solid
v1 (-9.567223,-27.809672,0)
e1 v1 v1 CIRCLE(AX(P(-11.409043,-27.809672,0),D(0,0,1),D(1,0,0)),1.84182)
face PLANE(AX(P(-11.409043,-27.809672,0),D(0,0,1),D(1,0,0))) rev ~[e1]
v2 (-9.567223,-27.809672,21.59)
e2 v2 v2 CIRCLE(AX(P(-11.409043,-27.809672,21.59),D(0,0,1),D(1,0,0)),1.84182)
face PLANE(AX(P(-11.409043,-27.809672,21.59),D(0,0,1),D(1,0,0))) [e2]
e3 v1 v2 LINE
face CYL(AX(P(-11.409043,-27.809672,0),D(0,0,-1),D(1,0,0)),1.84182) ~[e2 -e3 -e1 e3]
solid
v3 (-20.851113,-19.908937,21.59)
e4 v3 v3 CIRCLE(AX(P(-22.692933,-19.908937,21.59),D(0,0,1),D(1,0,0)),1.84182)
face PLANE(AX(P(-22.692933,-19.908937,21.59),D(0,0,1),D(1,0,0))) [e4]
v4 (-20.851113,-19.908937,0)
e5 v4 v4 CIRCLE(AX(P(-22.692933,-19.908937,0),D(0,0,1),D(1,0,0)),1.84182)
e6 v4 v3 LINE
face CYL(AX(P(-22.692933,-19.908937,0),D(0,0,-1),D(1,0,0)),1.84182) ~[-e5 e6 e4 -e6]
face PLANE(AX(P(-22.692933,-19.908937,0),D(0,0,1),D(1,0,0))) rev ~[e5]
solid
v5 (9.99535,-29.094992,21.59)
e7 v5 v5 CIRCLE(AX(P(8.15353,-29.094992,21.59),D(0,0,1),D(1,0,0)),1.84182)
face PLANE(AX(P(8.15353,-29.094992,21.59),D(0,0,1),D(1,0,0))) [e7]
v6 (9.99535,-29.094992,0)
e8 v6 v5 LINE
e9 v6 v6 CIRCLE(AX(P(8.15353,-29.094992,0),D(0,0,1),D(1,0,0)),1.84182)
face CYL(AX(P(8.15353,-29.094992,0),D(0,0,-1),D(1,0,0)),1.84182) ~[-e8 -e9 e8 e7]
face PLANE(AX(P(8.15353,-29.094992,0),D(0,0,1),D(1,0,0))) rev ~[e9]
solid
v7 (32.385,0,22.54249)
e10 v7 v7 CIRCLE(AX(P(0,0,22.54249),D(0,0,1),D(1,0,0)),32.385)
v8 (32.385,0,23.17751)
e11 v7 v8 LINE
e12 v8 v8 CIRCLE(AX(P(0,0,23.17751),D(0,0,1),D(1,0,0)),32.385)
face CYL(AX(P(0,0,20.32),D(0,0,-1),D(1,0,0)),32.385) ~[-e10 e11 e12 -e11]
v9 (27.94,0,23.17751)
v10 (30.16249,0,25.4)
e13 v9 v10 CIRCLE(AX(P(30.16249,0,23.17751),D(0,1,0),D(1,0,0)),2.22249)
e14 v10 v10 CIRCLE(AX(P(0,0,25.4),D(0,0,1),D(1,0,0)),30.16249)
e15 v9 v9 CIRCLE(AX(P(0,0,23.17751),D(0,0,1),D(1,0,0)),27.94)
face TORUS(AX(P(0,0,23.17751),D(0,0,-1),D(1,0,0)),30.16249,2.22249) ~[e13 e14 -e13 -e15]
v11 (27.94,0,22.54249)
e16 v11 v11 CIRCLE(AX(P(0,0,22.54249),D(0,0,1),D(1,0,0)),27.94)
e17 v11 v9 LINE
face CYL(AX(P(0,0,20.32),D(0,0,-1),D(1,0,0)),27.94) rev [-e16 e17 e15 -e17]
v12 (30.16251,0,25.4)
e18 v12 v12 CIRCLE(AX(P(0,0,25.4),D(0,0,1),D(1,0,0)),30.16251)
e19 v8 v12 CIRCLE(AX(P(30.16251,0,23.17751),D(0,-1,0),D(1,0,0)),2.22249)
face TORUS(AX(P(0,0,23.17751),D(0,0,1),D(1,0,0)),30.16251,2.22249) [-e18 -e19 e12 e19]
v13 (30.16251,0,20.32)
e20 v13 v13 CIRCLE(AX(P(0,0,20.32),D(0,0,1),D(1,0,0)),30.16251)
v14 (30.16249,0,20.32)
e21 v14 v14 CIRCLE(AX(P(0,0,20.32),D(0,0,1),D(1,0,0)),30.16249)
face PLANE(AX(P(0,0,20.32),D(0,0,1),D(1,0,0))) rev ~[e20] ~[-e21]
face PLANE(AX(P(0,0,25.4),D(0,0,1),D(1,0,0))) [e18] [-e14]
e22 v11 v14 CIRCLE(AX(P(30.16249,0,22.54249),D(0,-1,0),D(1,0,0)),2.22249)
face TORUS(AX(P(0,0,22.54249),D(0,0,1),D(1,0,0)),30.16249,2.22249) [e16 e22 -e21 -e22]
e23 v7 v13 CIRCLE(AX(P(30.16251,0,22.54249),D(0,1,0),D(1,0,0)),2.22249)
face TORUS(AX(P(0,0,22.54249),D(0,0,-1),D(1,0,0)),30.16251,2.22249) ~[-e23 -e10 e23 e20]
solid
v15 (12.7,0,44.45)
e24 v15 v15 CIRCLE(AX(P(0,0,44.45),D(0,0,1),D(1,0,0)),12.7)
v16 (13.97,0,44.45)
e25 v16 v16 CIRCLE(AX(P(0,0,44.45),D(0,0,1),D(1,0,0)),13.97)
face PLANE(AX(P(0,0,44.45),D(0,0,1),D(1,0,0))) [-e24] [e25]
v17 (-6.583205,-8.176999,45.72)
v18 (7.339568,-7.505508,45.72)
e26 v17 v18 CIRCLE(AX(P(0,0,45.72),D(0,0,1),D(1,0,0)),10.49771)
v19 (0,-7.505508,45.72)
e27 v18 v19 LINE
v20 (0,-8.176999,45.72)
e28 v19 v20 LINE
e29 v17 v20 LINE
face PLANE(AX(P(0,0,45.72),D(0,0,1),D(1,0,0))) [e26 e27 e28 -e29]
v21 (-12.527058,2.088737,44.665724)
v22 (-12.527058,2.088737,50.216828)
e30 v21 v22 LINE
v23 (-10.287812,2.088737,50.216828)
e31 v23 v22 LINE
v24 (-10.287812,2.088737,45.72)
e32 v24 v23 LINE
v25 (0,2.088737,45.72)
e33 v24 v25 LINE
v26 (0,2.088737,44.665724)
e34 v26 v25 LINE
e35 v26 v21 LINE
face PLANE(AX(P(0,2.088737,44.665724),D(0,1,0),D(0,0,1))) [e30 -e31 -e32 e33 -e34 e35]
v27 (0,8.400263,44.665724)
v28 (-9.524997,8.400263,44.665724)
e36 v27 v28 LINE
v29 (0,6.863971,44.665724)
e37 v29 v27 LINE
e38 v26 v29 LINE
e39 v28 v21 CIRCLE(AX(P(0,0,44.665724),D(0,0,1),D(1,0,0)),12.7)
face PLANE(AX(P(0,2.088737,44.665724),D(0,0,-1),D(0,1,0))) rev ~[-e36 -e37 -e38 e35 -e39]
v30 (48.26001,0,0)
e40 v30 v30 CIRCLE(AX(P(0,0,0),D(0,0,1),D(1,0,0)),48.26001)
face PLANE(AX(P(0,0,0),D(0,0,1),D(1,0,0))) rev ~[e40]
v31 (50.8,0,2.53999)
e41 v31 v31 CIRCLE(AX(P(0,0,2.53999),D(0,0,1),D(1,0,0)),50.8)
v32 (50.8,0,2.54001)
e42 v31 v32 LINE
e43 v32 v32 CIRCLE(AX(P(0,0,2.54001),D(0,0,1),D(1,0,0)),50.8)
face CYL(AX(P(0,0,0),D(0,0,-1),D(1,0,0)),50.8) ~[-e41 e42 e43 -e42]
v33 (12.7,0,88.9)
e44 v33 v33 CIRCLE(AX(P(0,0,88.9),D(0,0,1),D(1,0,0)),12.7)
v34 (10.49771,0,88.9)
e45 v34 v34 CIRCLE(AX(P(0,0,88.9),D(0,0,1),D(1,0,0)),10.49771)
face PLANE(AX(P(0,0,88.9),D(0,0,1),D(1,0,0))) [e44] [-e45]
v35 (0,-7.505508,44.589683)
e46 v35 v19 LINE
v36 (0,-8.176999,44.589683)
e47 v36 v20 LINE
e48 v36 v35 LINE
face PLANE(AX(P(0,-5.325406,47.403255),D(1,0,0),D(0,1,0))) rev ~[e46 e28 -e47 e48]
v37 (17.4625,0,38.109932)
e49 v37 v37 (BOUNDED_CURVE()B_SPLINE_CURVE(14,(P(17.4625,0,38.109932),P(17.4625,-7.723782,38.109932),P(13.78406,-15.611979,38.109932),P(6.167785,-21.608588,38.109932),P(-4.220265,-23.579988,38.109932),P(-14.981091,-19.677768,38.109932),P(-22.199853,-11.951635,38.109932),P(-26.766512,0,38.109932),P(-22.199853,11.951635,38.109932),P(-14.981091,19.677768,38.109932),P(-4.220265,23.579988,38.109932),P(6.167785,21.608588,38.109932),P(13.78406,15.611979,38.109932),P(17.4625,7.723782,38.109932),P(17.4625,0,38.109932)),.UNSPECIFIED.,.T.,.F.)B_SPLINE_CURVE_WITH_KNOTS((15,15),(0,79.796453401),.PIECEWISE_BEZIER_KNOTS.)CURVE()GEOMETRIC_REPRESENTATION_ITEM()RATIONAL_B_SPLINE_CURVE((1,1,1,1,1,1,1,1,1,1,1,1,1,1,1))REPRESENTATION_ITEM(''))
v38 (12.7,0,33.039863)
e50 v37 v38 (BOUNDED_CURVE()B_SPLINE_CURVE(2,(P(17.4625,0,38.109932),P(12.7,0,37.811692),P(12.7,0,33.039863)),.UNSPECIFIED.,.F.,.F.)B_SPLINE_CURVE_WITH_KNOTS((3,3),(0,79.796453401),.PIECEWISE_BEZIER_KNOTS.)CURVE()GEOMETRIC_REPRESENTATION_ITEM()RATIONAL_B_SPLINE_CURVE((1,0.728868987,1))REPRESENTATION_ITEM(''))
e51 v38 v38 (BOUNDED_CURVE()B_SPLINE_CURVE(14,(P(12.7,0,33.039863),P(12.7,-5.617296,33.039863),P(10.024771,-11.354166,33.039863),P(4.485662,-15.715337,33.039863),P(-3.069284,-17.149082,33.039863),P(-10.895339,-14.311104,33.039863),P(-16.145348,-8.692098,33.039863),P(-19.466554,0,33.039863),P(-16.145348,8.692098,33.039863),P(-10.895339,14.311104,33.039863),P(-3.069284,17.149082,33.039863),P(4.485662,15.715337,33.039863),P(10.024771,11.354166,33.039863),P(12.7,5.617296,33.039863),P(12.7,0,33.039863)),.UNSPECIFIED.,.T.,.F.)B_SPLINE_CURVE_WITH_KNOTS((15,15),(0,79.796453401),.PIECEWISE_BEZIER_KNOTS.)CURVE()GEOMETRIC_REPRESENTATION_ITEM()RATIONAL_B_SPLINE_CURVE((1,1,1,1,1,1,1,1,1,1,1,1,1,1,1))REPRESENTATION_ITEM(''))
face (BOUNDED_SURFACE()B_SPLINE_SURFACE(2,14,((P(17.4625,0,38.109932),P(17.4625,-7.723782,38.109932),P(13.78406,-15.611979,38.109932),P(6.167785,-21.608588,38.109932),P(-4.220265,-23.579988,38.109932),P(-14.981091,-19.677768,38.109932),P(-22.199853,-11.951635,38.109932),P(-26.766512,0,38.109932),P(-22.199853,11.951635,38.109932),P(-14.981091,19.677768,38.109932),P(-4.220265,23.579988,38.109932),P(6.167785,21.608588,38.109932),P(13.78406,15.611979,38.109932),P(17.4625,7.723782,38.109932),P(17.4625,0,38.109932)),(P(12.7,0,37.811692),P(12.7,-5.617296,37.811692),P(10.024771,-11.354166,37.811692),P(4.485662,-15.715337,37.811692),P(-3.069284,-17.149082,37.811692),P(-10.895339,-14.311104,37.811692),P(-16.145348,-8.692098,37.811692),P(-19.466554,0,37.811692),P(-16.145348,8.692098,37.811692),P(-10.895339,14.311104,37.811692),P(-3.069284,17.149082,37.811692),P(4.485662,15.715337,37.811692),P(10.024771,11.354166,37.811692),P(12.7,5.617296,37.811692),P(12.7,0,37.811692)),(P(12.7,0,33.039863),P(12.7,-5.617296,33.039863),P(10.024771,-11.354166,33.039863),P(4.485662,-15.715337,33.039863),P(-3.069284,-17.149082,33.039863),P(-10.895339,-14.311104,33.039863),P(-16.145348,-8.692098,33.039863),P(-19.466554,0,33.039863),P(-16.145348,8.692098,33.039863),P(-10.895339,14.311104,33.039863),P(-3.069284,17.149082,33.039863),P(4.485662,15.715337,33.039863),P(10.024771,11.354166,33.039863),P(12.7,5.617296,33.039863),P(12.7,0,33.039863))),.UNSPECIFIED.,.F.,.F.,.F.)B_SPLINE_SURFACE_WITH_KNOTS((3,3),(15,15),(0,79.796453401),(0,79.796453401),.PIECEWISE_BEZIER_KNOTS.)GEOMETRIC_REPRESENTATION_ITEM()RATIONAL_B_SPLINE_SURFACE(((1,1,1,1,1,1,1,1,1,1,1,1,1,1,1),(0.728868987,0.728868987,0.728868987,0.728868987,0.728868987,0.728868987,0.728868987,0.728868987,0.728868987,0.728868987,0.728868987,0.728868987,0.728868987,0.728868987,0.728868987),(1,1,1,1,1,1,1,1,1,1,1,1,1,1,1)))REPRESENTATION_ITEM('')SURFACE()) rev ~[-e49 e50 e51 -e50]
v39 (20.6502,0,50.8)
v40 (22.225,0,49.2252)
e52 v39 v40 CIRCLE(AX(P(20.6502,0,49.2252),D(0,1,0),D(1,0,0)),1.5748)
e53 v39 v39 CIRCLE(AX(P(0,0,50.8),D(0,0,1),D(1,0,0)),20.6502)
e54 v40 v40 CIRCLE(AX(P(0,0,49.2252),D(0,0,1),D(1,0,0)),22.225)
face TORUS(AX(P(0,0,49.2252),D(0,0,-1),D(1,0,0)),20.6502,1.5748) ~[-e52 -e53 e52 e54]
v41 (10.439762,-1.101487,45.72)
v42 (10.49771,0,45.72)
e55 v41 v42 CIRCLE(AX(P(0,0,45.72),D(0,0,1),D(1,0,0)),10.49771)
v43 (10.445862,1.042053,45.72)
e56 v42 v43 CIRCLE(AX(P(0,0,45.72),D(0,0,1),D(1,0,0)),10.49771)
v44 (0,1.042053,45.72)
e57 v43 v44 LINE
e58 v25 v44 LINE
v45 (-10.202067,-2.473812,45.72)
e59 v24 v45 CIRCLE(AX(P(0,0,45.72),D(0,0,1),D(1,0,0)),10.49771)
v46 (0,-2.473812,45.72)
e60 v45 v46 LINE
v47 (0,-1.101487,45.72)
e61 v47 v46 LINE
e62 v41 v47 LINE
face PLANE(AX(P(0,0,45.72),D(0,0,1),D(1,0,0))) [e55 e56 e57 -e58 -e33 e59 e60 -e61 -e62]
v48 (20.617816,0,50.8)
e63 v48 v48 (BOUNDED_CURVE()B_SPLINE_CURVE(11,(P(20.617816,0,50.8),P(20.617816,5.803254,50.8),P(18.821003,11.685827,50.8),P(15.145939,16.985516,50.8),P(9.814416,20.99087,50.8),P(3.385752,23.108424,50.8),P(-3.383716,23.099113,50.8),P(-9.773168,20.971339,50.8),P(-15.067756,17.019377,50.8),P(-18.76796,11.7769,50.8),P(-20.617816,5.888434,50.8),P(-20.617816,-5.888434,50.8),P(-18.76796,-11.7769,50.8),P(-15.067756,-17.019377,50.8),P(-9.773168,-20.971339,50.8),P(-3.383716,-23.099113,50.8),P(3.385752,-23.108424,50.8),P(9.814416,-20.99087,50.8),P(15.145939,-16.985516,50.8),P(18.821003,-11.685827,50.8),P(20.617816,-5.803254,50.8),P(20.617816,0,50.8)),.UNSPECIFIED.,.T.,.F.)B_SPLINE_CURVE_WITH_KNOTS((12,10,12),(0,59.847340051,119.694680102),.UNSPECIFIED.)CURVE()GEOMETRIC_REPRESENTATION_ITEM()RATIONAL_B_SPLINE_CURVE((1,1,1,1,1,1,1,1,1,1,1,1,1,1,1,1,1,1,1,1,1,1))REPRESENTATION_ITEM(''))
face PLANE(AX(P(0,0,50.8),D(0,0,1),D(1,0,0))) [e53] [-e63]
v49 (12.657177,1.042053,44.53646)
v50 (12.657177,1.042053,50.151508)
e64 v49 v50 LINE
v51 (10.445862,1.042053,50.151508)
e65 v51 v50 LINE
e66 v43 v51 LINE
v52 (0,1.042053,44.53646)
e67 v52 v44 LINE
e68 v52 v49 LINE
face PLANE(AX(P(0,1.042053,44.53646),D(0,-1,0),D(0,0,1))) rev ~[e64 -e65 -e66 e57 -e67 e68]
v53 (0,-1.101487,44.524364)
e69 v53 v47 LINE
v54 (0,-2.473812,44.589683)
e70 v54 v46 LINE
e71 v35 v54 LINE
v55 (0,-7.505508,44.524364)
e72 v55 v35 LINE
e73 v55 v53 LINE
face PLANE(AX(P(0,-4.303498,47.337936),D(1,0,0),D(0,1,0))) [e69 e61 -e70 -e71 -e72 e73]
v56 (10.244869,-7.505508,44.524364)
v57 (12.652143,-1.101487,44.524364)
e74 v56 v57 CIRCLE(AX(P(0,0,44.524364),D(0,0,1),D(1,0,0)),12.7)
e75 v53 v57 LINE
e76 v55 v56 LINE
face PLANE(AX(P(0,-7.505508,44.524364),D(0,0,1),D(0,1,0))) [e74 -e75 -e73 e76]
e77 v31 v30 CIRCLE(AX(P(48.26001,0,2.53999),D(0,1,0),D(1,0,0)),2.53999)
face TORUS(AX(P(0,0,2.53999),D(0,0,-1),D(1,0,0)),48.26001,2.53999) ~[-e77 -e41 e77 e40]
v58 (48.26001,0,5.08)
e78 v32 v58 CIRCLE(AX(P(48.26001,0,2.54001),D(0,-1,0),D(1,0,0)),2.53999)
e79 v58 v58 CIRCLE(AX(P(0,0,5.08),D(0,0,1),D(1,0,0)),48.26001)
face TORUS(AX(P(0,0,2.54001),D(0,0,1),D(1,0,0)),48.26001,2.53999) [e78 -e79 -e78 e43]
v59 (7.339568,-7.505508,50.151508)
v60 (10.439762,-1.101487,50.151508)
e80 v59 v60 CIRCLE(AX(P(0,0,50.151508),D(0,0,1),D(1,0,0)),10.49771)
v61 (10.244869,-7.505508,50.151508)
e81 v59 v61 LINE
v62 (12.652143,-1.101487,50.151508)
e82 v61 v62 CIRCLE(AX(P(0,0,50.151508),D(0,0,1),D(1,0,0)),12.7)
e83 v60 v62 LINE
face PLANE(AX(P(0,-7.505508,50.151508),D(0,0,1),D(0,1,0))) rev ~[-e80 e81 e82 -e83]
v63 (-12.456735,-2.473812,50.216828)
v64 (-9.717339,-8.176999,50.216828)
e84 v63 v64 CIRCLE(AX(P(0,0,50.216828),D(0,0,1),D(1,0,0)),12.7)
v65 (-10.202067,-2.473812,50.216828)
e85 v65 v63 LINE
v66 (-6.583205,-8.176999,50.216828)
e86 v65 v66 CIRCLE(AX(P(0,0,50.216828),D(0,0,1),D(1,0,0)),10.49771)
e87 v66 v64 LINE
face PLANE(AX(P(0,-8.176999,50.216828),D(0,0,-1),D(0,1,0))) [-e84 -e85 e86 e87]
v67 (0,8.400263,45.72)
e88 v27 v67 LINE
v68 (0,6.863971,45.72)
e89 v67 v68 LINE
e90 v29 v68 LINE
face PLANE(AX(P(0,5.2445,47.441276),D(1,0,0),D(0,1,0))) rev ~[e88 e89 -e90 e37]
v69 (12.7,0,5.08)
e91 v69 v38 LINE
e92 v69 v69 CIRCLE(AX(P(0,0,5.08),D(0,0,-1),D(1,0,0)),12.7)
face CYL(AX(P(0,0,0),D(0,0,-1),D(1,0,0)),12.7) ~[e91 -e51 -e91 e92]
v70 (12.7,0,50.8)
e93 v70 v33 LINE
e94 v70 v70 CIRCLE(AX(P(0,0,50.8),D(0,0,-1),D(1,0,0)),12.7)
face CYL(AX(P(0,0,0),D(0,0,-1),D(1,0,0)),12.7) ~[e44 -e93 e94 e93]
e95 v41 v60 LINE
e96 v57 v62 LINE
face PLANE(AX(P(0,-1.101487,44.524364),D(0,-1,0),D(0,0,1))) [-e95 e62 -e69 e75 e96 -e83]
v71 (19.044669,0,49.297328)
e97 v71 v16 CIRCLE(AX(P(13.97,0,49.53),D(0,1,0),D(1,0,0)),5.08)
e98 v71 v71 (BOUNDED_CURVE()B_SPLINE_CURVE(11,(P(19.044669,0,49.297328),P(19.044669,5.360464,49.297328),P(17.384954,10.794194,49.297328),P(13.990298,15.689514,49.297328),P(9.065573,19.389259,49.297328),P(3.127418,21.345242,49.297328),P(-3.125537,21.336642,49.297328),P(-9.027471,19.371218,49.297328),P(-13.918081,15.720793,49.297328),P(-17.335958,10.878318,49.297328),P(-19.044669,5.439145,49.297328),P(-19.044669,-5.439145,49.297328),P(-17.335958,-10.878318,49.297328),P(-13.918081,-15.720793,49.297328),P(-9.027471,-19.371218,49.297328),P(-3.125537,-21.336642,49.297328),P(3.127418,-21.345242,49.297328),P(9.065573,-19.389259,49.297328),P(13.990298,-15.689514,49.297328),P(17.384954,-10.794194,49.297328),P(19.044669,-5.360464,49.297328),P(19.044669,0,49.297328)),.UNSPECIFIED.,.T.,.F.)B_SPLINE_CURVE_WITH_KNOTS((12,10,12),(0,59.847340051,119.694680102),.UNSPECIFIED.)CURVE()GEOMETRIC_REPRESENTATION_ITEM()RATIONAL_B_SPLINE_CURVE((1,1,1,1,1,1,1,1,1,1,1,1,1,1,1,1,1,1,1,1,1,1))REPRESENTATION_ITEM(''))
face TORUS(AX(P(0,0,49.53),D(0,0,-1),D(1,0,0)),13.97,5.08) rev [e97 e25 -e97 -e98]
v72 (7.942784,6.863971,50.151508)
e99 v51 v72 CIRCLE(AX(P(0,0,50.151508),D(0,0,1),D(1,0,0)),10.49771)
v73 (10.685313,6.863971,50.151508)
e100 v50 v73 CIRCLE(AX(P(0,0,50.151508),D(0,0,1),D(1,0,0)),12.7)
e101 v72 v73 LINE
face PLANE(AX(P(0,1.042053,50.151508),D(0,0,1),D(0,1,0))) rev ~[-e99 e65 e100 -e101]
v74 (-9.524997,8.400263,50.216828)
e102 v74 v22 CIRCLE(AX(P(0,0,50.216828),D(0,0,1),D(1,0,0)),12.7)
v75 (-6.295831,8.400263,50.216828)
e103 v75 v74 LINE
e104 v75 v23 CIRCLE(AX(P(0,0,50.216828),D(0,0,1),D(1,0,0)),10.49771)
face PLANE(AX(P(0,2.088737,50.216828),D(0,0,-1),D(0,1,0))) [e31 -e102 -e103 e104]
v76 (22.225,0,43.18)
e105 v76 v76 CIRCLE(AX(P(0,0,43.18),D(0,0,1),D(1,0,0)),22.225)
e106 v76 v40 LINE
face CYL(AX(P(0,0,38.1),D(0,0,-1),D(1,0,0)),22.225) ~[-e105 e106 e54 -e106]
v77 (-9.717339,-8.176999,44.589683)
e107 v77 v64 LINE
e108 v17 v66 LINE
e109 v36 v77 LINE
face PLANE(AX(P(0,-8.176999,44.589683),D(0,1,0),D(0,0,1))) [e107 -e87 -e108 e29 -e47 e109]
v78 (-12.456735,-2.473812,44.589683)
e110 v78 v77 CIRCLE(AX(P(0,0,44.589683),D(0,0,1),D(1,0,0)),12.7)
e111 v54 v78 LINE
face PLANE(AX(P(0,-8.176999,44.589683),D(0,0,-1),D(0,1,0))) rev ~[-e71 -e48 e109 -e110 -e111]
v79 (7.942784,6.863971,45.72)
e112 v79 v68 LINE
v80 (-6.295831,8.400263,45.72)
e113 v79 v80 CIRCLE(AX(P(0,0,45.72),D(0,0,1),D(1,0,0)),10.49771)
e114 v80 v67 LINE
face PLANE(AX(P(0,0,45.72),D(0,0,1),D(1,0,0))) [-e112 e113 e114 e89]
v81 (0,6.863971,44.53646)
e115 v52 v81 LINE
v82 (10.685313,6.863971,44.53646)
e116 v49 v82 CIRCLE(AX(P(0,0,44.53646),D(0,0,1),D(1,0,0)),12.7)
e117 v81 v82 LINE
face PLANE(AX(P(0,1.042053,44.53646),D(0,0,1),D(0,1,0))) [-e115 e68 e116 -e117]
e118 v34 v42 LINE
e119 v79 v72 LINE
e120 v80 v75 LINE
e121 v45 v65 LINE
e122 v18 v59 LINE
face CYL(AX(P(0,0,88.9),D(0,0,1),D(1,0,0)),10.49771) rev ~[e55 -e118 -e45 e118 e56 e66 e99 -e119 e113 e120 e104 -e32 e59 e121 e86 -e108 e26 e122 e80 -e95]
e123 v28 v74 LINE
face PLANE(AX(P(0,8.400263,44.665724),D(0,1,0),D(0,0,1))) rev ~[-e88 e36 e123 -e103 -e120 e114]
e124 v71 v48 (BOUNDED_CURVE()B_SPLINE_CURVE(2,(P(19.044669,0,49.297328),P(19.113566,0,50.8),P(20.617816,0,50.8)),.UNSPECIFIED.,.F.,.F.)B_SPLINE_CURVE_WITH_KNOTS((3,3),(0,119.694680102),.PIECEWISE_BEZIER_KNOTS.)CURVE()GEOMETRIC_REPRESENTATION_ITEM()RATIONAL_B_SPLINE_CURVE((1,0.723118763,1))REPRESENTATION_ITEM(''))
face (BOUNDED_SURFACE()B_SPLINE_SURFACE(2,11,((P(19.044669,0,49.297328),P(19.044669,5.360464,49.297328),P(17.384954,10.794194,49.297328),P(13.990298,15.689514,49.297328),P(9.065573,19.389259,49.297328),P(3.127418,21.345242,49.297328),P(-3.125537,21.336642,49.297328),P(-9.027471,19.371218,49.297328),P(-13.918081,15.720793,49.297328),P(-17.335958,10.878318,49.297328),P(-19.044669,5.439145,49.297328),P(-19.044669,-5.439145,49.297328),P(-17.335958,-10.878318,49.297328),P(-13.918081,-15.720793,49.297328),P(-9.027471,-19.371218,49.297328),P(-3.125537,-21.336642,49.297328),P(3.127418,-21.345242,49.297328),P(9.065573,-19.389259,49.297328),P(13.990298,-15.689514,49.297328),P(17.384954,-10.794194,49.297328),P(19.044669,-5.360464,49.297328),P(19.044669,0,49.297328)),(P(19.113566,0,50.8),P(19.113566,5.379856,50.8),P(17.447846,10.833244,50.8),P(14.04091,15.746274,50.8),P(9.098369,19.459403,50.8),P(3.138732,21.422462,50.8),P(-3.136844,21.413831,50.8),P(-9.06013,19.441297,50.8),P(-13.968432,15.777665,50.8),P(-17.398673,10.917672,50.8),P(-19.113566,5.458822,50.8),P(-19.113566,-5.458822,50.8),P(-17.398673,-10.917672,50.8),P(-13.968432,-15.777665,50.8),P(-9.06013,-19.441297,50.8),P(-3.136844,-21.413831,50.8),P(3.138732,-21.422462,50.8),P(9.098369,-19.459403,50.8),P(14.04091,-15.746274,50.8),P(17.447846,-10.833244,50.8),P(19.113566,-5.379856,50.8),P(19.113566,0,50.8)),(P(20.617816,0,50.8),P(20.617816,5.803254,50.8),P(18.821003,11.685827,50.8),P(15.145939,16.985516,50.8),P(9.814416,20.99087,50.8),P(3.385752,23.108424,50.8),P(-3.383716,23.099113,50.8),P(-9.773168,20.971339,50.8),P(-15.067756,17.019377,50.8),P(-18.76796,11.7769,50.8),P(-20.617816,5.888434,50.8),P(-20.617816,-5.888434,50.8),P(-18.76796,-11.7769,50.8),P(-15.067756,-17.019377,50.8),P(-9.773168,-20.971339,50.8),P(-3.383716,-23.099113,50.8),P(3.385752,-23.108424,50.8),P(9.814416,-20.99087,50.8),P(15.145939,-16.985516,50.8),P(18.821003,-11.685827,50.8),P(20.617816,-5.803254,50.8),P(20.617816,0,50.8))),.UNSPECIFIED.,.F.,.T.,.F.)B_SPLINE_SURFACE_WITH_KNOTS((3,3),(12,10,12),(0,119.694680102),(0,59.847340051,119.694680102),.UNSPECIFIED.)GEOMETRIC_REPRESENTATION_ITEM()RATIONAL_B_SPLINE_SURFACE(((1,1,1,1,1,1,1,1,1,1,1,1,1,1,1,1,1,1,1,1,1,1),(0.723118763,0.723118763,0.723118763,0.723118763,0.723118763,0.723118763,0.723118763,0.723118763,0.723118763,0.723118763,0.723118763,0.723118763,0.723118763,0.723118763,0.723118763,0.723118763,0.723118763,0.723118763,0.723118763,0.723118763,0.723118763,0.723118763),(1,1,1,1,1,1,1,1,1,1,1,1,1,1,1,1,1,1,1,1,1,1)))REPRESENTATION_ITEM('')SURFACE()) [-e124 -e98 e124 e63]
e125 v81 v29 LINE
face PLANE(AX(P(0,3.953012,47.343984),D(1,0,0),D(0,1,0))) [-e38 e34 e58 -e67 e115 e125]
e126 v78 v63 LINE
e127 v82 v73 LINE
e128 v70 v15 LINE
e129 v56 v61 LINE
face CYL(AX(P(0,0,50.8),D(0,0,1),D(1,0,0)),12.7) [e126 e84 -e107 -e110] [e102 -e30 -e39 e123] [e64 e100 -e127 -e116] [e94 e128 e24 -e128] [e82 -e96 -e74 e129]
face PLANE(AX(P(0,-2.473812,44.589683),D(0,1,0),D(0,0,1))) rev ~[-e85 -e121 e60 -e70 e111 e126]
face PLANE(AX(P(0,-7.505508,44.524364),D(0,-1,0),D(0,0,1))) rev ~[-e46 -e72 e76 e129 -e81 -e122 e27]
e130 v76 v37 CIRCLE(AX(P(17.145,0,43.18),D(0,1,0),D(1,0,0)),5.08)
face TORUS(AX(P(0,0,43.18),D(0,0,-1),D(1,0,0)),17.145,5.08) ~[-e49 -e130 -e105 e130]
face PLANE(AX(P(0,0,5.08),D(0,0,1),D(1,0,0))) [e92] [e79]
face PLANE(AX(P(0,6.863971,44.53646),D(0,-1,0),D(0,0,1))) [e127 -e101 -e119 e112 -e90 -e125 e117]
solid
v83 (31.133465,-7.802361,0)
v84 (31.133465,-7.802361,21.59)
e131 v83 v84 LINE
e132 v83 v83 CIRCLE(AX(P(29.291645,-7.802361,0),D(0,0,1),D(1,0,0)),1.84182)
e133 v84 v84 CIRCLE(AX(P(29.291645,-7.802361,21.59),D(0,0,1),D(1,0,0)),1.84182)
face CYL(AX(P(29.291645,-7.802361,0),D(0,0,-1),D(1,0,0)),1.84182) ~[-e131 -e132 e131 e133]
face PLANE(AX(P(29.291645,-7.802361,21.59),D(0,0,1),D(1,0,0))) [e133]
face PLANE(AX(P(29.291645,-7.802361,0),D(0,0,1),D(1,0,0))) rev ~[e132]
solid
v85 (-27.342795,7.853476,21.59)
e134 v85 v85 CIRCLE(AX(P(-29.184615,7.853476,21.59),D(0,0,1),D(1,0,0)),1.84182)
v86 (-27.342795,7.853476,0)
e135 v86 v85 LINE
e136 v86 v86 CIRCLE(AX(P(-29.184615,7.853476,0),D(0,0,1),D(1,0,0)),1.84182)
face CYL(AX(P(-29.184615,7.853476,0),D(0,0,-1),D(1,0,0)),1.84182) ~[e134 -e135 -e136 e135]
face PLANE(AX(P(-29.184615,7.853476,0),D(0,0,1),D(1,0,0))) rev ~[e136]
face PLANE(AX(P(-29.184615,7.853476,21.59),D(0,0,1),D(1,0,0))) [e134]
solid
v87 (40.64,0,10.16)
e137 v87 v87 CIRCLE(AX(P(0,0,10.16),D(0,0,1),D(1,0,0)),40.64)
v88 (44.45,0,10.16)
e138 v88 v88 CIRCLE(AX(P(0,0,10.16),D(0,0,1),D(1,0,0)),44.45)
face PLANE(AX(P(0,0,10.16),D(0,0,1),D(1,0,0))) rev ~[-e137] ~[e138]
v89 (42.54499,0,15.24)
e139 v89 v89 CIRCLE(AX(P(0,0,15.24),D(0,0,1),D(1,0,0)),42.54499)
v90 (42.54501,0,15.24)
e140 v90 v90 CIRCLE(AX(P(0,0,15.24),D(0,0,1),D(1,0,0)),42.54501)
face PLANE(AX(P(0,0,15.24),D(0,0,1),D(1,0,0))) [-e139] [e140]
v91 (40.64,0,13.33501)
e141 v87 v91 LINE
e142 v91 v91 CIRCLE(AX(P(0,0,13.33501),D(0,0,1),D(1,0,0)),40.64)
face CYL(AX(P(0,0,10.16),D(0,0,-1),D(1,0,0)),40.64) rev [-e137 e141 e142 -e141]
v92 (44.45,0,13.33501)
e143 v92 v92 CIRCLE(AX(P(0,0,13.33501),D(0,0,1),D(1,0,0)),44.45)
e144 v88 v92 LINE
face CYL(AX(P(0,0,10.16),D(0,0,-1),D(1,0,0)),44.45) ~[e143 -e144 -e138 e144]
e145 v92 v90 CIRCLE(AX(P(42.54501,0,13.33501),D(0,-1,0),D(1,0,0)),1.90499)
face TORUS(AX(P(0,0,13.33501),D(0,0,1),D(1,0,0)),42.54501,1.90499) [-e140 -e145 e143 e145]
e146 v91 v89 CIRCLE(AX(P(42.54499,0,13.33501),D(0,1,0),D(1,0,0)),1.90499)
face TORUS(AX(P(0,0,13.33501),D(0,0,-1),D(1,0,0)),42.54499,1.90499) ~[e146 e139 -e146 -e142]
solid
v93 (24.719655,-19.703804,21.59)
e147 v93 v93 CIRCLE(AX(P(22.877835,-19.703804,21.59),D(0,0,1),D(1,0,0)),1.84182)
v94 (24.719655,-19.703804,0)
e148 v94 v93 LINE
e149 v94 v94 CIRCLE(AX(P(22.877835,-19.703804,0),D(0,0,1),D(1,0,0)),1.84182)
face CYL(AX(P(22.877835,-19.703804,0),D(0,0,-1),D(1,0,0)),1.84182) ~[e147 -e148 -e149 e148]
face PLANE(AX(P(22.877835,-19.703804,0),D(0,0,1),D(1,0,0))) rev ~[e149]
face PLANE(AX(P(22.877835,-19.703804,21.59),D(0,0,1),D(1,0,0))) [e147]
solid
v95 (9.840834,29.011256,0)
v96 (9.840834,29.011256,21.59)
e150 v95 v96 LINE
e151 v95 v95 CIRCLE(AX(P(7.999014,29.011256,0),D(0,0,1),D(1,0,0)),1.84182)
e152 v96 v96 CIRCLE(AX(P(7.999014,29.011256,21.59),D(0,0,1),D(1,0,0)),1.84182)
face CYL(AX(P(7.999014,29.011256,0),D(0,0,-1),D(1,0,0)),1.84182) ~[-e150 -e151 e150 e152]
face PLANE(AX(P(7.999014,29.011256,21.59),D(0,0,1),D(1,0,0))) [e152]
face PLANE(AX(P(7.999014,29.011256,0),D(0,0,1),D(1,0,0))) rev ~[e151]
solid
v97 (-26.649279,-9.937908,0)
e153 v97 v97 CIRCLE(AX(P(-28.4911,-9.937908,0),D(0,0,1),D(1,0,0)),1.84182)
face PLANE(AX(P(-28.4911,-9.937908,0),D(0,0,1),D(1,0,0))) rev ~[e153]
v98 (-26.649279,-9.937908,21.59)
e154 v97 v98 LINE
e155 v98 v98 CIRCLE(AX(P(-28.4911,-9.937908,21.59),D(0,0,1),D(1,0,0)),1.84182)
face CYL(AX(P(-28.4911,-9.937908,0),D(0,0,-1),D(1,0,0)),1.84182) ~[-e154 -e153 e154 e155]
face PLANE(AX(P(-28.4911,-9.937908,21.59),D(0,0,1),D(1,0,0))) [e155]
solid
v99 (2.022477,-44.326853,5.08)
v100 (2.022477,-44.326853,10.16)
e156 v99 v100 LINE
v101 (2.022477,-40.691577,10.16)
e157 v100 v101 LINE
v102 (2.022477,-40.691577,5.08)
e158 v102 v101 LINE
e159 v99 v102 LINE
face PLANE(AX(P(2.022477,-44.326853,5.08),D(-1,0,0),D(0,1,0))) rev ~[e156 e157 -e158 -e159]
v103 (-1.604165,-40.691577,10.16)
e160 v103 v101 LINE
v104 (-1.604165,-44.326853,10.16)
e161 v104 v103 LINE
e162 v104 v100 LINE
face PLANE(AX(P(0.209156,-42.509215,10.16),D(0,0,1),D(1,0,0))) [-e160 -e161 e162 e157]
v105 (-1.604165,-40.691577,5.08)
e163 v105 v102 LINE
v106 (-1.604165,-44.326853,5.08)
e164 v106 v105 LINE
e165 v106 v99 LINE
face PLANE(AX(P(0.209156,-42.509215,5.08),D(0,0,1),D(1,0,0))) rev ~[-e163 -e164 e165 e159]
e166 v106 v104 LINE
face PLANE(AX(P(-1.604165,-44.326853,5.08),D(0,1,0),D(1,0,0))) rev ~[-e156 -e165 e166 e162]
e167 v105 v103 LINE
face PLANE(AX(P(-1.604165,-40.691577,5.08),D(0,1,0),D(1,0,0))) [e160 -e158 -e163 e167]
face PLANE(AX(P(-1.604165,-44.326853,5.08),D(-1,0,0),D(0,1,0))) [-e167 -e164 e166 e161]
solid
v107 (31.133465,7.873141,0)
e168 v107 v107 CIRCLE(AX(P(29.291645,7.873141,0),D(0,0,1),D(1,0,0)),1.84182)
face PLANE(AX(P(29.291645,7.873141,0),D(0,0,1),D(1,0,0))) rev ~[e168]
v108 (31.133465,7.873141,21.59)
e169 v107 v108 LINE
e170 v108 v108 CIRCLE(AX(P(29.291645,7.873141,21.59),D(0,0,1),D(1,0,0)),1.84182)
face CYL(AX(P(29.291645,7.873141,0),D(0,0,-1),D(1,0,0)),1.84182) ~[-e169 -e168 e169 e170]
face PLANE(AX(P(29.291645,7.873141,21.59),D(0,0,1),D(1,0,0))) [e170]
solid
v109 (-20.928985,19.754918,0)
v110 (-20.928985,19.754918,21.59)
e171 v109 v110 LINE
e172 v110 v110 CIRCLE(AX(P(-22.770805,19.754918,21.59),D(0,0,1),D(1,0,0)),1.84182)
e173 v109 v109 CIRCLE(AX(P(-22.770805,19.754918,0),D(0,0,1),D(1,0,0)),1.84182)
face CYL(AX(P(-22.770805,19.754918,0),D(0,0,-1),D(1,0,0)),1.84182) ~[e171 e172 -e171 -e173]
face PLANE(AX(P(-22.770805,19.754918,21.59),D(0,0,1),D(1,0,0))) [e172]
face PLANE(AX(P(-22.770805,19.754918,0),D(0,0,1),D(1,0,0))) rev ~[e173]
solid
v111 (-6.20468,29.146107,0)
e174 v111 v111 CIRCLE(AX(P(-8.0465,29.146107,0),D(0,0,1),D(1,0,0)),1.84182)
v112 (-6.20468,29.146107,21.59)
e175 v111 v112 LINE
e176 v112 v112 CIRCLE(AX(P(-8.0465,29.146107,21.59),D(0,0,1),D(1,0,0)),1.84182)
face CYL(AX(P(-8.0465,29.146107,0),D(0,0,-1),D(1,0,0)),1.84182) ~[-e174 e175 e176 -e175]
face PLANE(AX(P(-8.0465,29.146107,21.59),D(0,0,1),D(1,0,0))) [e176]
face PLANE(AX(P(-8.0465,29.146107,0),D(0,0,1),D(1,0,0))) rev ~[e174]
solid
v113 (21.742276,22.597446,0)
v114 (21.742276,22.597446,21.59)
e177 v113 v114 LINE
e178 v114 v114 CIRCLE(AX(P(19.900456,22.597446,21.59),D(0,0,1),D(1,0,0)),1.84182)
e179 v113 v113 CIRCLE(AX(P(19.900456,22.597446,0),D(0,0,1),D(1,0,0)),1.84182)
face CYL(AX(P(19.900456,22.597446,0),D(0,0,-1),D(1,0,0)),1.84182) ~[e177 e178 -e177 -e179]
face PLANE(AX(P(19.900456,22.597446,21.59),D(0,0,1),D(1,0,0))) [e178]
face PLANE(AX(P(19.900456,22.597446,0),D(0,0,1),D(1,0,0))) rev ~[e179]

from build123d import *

# Parameters (mm, degrees)
F0_R      = 50.8
F1_DEPTH  = 5.08
F2_R      = 2.53999
F3_R      = 12.7
F4_DEPTH  = 88.9
F6_START  = 38.1
F5_R      = 22.225
F6_DEPTH  = 12.7
F7_R      = 5.08
F8_R      = 19.05
F8_R_2    = 12.7
F9_DEPTH  = 6.35
F10_R     = 5.08
F11_W     = 5.7031868491
F11_H     = 5.6271441281
F11_W_2   = 6.3115260564
F11_H_2   = 5.5511035025
F12_DEPTH = 12.7
F13_W     = 6.40402094
F13_H     = 5.6271441281
F13_W_2   = 5.8219179045
F13_H_2   = 5.6150481105
F14_DEPTH = 12.7
F15_R     = 10.4977096987
F16_DEPTH = 43.18
F17_R     = 1.574799746
F19_START = 20.32
F18_R     = 32.385
F18_R_2   = 27.94
F19_DEPTH = 5.08
F20_R     = 2.22249
F21_R     = 1.8418202524
F22_DEPTH = 21.59
F24_START = 10.16
F23_R     = 44.45
F23_R_2   = 40.64
F24_DEPTH = 5.08
F25_R     = 1.90499
F26_R     = 5.08
F28_START = 5.08
F27_W     = 3.6266420502
F27_H     = 3.635276109
F28_DEPTH = 5.08


# Not quite as in the source:
# - a fillet or chamfer is up to 0.001 mm smaller than in the source, because OpenCascade refuses the exact size


with BuildPart() as f1:
    # F0 (on Top) → F1 (new body)
    with BuildSketch(Plane.XY):
        Circle(F0_R)
    extrude(amount=F1_DEPTH)

    # F2 (radius 2.54 in the source; OpenCascade refuses exactly that, so slightly less here)
    f2_edges = [f1.edges().sort_by_distance(p)[0] for p in [
        (50.8, 0, 2.54),
        (-50.8, 0, 0),
        (-50.8, 0, 5.08),
    ]]
    fillet(f2_edges, radius=F2_R)

    # F3 (on Top) → F4 (join)
    with BuildSketch(Plane.XY):
        Circle(F3_R)
    extrude(amount=F4_DEPTH)

    # F5 (on Top) → F6 (join)
    with BuildSketch(Plane.XY.offset(F6_START)):
        Circle(F5_R)
    extrude(amount=F6_DEPTH)

    # F7
    f7_edges = [f1.edges().sort_by_distance(p)[0] for p in [
        (-22.225, 0, 38.1),
    ]]
    fillet(f7_edges, radius=F7_R)

    # F8 (on face) → F9 (cut)
    with BuildSketch(Plane.XY.offset(50.8)):
        Circle(F8_R)
        Circle(F8_R_2, mode=Mode.SUBTRACT)
    extrude(amount=-F9_DEPTH, mode=Mode.SUBTRACT)

    # F10
    f10_edges = [f1.edges().sort_by_distance(p)[0] for p in [
        (-19.05, 0, 44.45),
    ]]
    fillet(f10_edges, radius=F10_R)

    # F11 (on Right) → F12 (cut)
    with BuildSketch(Plane.YZ):
        with Locations((-5.325405742, 47.4032554775)):
            Rectangle(F11_W, F11_H)
        with Locations((5.2445002366, 47.4412757903)):
            Rectangle(F11_W_2, F11_H_2)
    extrude(amount=-F12_DEPTH, mode=Mode.SUBTRACT)

    # F13 (on Right) → F14 (cut)
    with BuildSketch(Plane.YZ):
        with Locations((-4.3034976698, 47.3379362375)):
            Rectangle(F13_W, F13_H)
        with Locations((3.9530118229, 47.3439842463)):
            Rectangle(F13_W_2, F13_H_2)
    extrude(amount=F14_DEPTH, mode=Mode.SUBTRACT)

    # F15 (on face) → F16 (cut)
    with BuildSketch(Plane.XY.offset(88.9)):
        Circle(F15_R)
    extrude(amount=-F16_DEPTH, mode=Mode.SUBTRACT)

    # F17
    f17_edges = [f1.edges().sort_by_distance(p)[0] for p in [
        (-19.05, 0, 50.8),
        (-22.225, 0, 50.8),
    ]]
    fillet(f17_edges, radius=F17_R)

    # F26
    f26_edges = [f1.edges().sort_by_distance(p)[0] for p in [
        (-12.7, 0, 38.1),
    ]]
    fillet(f26_edges, radius=F26_R)


with BuildPart() as f19:
    # F18 (on Top) → F19 (new body)
    with BuildSketch(Plane.XY.offset(F19_START)):
        Circle(F18_R)
        Circle(F18_R_2, mode=Mode.SUBTRACT)
    extrude(amount=F19_DEPTH)

    # F20 (radius 2.2225 in the source; OpenCascade refuses exactly that, so slightly less here)
    f20_edges = [f19.edges().sort_by_distance(p)[0] for p in [
        (-27.94, 0, 25.4),
        (-32.385, 0, 25.4),
        (-27.94, 0, 20.32),
        (-32.385, 0, 20.32),
    ]]
    fillet(f20_edges, radius=F20_R)


with BuildPart() as f22:
    # F21 (on Top) → F22 (new body)
    with BuildSketch(Plane.XY):
        with Locations((-11.4090433344, -27.8096720576)):
            Circle(F21_R)
    extrude(amount=F22_DEPTH)


with BuildPart() as f22b:
    # F21 (on Top) → F22, piece 2 (new body)
    with BuildSketch(Plane.XY):
        with Locations((8.1535298377, -29.0949922055)):
            Circle(F21_R)
    extrude(amount=F22_DEPTH)


with BuildPart() as f22c:
    # F21 (on Top) → F22, piece 3 (new body)
    with BuildSketch(Plane.XY):
        with Locations((22.8778347373, -19.703803584)):
            Circle(F21_R)
    extrude(amount=F22_DEPTH)


with BuildPart() as f22d:
    # F21 (on Top) → F22, piece 4 (new body)
    with BuildSketch(Plane.XY):
        with Locations((-22.6929332038, -19.9089368758)):
            Circle(F21_R)
    extrude(amount=F22_DEPTH)


with BuildPart() as f22e:
    # F21 (on Top) → F22, piece 5 (new body)
    with BuildSketch(Plane.XY):
        with Locations((29.2916446924, -7.8023611568)):
            Circle(F21_R)
    extrude(amount=F22_DEPTH)


with BuildPart() as f22f:
    # F21 (on Top) → F22, piece 6 (new body)
    with BuildSketch(Plane.XY):
        with Locations((29.2916446924, 7.8731411513)):
            Circle(F21_R)
    extrude(amount=F22_DEPTH)


with BuildPart() as f22g:
    # F21 (on Top) → F22, piece 7 (new body)
    with BuildSketch(Plane.XY):
        with Locations((19.9004560709, 22.5974460508)):
            Circle(F21_R)
    extrude(amount=F22_DEPTH)


with BuildPart() as f22h:
    # F21 (on Top) → F22, piece 8 (new body)
    with BuildSketch(Plane.XY):
        with Locations((7.9990136437, 29.011256006)):
            Circle(F21_R)
    extrude(amount=F22_DEPTH)


with BuildPart() as f22i:
    # F21 (on Top) → F22, piece 9 (new body)
    with BuildSketch(Plane.XY):
        with Locations((-8.0465003848, 29.1461069137)):
            Circle(F21_R)
    extrude(amount=F22_DEPTH)


with BuildPart() as f22j:
    # F21 (on Top) → F22, piece 10 (new body)
    with BuildSketch(Plane.XY):
        with Locations((-22.7708052844, 19.7549182922)):
            Circle(F21_R)
    extrude(amount=F22_DEPTH)


with BuildPart() as f22k:
    # F21 (on Top) → F22, piece 11 (new body)
    with BuildSketch(Plane.XY):
        with Locations((-29.1846152395, 7.853475865)):
            Circle(F21_R)
    extrude(amount=F22_DEPTH)


with BuildPart() as f22l:
    # F21 (on Top) → F22, piece 12 (new body)
    with BuildSketch(Plane.XY):
        with Locations((-28.4910995079, -9.9379075691)):
            Circle(F21_R)
    extrude(amount=F22_DEPTH)


with BuildPart() as f24:
    # F23 (on Top) → F24 (new body)
    with BuildSketch(Plane.XY.offset(F24_START)):
        Circle(F23_R)
        Circle(F23_R_2, mode=Mode.SUBTRACT)
    extrude(amount=F24_DEPTH)

    # F25 (radius 1.905 in the source; OpenCascade refuses exactly that, so slightly less here)
    f25_edges = [f24.edges().sort_by_distance(p)[0] for p in [
        (-40.64, 0, 15.24),
        (-44.45, 0, 15.24),
    ]]
    fillet(f25_edges, radius=F25_R)


with BuildPart() as f28:
    # F27 (on Top) → F28 (new body)
    with BuildSketch(Plane.XY.offset(F28_START)):
        with Locations((0.2091563074, -42.5092149526)):
            Rectangle(F27_W, F27_H)
    extrude(amount=F28_DEPTH)


solid = Compound([f1.part, f19.part, f22.part, f22b.part, f22c.part, f22d.part, f22e.part, f22f.part, f22g.part, f22h.part, f22i.part, f22j.part, f22k.part, f22l.part, f24.part, f28.part])
